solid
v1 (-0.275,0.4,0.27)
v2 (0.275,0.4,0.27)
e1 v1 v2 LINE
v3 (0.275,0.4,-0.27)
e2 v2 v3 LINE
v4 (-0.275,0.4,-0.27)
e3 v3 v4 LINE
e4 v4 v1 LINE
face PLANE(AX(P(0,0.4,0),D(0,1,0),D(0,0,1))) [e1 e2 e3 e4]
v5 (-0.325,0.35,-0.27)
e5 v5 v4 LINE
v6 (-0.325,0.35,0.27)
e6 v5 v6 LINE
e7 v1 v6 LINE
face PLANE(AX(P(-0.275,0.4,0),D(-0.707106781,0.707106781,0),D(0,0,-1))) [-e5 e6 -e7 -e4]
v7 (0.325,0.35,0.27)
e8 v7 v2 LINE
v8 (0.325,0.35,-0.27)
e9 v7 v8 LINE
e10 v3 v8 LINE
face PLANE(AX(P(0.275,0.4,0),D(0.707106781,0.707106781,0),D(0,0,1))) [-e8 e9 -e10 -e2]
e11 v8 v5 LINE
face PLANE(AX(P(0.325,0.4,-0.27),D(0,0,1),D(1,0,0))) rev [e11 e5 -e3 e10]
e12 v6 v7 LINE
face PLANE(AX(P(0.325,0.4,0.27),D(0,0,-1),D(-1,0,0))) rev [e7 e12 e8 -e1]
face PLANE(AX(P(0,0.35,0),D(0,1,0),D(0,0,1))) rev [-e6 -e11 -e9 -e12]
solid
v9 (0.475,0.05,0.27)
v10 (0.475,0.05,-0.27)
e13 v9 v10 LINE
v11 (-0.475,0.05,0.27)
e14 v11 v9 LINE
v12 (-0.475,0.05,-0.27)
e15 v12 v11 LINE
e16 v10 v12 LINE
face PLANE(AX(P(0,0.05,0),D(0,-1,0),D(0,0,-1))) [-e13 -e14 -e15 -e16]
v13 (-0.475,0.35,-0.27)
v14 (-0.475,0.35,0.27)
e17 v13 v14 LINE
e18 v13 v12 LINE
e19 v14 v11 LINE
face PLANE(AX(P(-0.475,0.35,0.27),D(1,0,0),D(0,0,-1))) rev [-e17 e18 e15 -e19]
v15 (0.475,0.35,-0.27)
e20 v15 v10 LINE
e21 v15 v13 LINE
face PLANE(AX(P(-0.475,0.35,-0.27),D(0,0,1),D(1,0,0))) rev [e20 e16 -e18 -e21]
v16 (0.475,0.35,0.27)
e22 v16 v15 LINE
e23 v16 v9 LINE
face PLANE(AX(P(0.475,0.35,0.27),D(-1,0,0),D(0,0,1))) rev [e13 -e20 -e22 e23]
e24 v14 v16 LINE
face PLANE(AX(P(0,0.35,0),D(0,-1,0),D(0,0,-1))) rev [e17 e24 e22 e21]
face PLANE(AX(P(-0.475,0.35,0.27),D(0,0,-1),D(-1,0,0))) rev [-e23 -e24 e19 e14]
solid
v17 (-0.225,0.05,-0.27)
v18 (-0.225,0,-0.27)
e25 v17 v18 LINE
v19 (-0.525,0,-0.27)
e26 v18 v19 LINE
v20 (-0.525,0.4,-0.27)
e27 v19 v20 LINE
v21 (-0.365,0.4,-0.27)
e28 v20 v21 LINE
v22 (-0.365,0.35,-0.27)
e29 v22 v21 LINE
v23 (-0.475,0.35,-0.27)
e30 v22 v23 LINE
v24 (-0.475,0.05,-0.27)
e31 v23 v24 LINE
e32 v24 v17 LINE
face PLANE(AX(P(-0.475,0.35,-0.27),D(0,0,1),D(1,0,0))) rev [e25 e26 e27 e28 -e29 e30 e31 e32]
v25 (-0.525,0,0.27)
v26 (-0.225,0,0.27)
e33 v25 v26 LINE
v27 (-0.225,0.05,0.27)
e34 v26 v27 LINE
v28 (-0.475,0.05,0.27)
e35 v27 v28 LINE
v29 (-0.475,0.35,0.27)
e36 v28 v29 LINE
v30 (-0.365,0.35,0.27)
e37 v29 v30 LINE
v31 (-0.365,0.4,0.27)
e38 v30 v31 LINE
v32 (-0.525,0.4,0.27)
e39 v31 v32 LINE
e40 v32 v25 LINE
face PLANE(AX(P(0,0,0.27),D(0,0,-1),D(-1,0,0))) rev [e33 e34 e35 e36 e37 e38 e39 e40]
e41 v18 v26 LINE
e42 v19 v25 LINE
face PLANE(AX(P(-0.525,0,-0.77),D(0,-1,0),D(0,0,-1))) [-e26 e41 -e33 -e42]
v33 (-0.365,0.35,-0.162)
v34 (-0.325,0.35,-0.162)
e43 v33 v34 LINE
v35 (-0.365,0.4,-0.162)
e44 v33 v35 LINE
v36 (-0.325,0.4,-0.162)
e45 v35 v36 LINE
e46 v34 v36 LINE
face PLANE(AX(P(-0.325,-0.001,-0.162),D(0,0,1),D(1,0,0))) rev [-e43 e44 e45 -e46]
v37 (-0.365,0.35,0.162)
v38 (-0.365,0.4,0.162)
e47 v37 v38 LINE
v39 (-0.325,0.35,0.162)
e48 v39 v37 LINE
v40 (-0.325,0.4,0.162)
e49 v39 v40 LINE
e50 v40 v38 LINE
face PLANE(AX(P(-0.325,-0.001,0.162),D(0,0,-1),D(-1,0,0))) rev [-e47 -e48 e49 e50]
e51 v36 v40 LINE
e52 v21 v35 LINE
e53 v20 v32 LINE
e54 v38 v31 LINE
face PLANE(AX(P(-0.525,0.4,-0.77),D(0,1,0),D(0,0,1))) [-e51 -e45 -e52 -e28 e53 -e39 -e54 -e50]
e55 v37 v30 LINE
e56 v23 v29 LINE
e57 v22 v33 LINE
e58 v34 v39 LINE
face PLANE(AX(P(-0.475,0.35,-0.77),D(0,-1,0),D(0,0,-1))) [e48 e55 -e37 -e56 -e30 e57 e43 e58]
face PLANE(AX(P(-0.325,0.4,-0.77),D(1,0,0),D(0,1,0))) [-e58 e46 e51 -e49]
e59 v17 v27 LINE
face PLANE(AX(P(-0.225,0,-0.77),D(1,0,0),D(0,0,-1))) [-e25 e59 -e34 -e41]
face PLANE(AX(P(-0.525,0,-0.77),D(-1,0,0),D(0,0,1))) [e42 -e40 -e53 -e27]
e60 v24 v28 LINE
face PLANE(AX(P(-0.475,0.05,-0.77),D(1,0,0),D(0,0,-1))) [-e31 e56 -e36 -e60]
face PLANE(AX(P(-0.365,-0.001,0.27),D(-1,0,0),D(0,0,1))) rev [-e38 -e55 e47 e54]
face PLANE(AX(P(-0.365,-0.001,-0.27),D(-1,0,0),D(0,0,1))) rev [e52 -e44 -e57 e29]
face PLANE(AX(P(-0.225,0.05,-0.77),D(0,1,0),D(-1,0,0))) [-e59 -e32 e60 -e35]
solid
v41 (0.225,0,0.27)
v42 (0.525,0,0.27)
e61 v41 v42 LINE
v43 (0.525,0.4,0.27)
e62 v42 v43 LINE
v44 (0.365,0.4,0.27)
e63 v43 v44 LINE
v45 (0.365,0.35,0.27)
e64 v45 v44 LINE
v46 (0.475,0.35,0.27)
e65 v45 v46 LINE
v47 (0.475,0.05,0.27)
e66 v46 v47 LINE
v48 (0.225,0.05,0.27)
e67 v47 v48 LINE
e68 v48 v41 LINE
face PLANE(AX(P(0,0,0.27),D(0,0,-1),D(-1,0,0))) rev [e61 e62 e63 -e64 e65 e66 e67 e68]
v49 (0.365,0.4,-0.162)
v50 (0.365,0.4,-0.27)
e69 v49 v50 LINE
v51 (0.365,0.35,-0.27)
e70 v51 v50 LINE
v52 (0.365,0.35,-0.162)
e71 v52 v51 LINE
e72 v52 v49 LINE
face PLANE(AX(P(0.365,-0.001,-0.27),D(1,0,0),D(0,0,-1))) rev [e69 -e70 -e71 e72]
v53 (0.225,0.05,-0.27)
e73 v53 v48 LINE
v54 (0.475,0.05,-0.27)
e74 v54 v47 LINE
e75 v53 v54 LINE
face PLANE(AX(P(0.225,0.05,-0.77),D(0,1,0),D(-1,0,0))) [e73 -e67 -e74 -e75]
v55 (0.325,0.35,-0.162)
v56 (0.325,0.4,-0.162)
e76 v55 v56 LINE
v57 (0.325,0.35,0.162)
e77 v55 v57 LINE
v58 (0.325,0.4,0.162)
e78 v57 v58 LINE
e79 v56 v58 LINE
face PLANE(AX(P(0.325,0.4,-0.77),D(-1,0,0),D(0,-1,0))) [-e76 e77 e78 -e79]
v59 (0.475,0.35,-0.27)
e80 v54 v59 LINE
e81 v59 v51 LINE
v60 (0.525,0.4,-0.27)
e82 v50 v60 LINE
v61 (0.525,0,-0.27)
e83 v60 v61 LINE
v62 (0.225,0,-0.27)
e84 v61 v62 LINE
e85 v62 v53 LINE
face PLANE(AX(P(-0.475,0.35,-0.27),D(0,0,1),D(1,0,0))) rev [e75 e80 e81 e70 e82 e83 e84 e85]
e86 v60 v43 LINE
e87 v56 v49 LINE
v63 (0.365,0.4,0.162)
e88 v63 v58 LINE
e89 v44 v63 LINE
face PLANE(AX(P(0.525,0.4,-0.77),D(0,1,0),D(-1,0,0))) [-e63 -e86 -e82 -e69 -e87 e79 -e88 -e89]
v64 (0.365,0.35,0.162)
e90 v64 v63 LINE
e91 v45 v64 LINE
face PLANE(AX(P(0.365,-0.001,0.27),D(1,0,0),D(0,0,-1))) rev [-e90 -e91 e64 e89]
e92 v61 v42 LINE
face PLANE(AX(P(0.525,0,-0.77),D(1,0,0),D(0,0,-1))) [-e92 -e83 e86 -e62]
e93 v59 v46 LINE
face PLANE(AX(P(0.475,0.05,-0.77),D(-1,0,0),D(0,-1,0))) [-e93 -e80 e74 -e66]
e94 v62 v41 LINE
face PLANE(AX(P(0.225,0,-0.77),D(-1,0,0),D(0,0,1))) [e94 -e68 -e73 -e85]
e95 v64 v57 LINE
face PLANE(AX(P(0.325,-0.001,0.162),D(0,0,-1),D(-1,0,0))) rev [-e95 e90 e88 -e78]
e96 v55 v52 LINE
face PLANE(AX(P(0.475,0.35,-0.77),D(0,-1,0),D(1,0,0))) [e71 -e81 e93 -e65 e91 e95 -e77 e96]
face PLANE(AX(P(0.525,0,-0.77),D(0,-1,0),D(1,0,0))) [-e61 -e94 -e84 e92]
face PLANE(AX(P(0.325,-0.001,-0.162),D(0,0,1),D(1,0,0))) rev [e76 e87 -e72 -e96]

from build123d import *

# Parameters (mm, degrees)
EXTRUDE_START       = 0.05
SKETCH_1_W          = 0.95
SKETCH_1_H          = 0.54
EXTRUDE_1_DEPTH     = 0.3
SKETCH_3_W          = 0.65
SKETCH_3_H          = 0.54
EXTRUDE_2_DEPTH     = 0.05
CHAMFER_1_SIZE      = 0.05
EXTRUDE_3_DEPTH     = 0.54
EXTRUDE_3_2_DEPTH   = 0.54
SKETCH_5_W          = 0.04
SKETCH_5_H          = 0.108
CUT_EXTRUDE_1_DEPTH = 0.05


with BuildPart() as part:
    # Эскиз1 → Бобышка-Вытянуть1 (new body)
    with BuildSketch(Plane(origin=(0, 0, 0), x_dir=(1, 0, 0), z_dir=(0, 1, 0)).offset(EXTRUDE_START)):
        Rectangle(SKETCH_1_W, SKETCH_1_H)
    extrude(amount=EXTRUDE_1_DEPTH)


with BuildPart() as body_2:
    # Эскиз3 → Бобышка-Вытянуть2 (new body)
    with BuildSketch(Plane(origin=(0, 0.35, 0), x_dir=(1, 0, 0), z_dir=(0, 1, 0))):
        Rectangle(SKETCH_3_W, SKETCH_3_H)
    extrude(amount=EXTRUDE_2_DEPTH)

    # Фаска1
    # the kernel refuses this chamfer: 0.05 mm, written as the material it takes off along each edge
    with BuildSketch(Plane(origin=(-0.325, 0.4, 0.398584149), x_dir=(-0.027495876610586285, -0.9996219169112968, 0), z_dir=(0, 0, -1)), Plane(origin=(0.325, 0.4, -0.398584149), x_dir=(0.027495876610586285, -0.9996219169112968, 0), z_dir=(0, 0, 1))) as chamfer_1_piece_1:
        Polygon((CHAMFER_1_SIZE * 0.999621916911, -CHAMFER_1_SIZE * 0.0274958766106), (-CHAMFER_1_SIZE * 0.0274958766106, -CHAMFER_1_SIZE * 0.999621916911), (0, 0), align=None)
    extrude(amount=0.797168299, mode=Mode.SUBTRACT)


with BuildPart() as body_3:
    # Эскиз4 → Бобышка-Вытянуть3 (new body)
    with BuildSketch(Plane.XY.offset(0.27)):
        Polygon((-0.525, 0), (-0.525, 0.4), (-0.325, 0.4), (-0.325, 0.35), (-0.475, 0.35), (-0.475, 0.05), (-0.225, 0.05), (-0.225, 0), align=None)
    extrude(amount=-EXTRUDE_3_DEPTH)


with BuildPart() as body_4:
    # Эскиз4 → Extrude 3 2 (new body)
    with BuildSketch(Plane.XY.offset(0.27)):
        Polygon((0.225, 0.05), (0.475, 0.05), (0.475, 0.35), (0.325, 0.35), (0.325, 0.4), (0.525, 0.4), (0.525, 0), (0.225, 0), align=None)
    extrude(amount=-EXTRUDE_3_2_DEPTH)


with BuildPart() as cut_extrude_1_tool:
    # Эскиз5 → Вырез-Вытянуть1 (new body)
    with BuildSketch(Plane(origin=(0, 0.4, 0), x_dir=(1, 0, 0), z_dir=(0, 1, 0))):
        with Locations((0.345, 0.216)):
            Rectangle(SKETCH_5_W, SKETCH_5_H)
        with Locations((-0.345, 0.216)):
            Rectangle(SKETCH_5_W, SKETCH_5_H)
        with Locations((-0.345, -0.216)):
            Rectangle(SKETCH_5_W, SKETCH_5_H)
        with Locations((0.345, -0.216)):
            Rectangle(SKETCH_5_W, SKETCH_5_H)
    extrude(amount=-CUT_EXTRUDE_1_DEPTH)


with BuildPart() as body_3_1:
    add(body_3.part)

    # Вырез-Вытянуть1: cut by cut_extrude_1_tool
    add(cut_extrude_1_tool.part, mode=Mode.SUBTRACT)


with BuildPart() as body_4_1:
    add(body_4.part)

    # Вырез-Вытянуть1: cut by cut_extrude_1_tool
    add(cut_extrude_1_tool.part, mode=Mode.SUBTRACT)


solid = Compound([part.part, body_2.part, body_3_1.part, body_4_1.part])
